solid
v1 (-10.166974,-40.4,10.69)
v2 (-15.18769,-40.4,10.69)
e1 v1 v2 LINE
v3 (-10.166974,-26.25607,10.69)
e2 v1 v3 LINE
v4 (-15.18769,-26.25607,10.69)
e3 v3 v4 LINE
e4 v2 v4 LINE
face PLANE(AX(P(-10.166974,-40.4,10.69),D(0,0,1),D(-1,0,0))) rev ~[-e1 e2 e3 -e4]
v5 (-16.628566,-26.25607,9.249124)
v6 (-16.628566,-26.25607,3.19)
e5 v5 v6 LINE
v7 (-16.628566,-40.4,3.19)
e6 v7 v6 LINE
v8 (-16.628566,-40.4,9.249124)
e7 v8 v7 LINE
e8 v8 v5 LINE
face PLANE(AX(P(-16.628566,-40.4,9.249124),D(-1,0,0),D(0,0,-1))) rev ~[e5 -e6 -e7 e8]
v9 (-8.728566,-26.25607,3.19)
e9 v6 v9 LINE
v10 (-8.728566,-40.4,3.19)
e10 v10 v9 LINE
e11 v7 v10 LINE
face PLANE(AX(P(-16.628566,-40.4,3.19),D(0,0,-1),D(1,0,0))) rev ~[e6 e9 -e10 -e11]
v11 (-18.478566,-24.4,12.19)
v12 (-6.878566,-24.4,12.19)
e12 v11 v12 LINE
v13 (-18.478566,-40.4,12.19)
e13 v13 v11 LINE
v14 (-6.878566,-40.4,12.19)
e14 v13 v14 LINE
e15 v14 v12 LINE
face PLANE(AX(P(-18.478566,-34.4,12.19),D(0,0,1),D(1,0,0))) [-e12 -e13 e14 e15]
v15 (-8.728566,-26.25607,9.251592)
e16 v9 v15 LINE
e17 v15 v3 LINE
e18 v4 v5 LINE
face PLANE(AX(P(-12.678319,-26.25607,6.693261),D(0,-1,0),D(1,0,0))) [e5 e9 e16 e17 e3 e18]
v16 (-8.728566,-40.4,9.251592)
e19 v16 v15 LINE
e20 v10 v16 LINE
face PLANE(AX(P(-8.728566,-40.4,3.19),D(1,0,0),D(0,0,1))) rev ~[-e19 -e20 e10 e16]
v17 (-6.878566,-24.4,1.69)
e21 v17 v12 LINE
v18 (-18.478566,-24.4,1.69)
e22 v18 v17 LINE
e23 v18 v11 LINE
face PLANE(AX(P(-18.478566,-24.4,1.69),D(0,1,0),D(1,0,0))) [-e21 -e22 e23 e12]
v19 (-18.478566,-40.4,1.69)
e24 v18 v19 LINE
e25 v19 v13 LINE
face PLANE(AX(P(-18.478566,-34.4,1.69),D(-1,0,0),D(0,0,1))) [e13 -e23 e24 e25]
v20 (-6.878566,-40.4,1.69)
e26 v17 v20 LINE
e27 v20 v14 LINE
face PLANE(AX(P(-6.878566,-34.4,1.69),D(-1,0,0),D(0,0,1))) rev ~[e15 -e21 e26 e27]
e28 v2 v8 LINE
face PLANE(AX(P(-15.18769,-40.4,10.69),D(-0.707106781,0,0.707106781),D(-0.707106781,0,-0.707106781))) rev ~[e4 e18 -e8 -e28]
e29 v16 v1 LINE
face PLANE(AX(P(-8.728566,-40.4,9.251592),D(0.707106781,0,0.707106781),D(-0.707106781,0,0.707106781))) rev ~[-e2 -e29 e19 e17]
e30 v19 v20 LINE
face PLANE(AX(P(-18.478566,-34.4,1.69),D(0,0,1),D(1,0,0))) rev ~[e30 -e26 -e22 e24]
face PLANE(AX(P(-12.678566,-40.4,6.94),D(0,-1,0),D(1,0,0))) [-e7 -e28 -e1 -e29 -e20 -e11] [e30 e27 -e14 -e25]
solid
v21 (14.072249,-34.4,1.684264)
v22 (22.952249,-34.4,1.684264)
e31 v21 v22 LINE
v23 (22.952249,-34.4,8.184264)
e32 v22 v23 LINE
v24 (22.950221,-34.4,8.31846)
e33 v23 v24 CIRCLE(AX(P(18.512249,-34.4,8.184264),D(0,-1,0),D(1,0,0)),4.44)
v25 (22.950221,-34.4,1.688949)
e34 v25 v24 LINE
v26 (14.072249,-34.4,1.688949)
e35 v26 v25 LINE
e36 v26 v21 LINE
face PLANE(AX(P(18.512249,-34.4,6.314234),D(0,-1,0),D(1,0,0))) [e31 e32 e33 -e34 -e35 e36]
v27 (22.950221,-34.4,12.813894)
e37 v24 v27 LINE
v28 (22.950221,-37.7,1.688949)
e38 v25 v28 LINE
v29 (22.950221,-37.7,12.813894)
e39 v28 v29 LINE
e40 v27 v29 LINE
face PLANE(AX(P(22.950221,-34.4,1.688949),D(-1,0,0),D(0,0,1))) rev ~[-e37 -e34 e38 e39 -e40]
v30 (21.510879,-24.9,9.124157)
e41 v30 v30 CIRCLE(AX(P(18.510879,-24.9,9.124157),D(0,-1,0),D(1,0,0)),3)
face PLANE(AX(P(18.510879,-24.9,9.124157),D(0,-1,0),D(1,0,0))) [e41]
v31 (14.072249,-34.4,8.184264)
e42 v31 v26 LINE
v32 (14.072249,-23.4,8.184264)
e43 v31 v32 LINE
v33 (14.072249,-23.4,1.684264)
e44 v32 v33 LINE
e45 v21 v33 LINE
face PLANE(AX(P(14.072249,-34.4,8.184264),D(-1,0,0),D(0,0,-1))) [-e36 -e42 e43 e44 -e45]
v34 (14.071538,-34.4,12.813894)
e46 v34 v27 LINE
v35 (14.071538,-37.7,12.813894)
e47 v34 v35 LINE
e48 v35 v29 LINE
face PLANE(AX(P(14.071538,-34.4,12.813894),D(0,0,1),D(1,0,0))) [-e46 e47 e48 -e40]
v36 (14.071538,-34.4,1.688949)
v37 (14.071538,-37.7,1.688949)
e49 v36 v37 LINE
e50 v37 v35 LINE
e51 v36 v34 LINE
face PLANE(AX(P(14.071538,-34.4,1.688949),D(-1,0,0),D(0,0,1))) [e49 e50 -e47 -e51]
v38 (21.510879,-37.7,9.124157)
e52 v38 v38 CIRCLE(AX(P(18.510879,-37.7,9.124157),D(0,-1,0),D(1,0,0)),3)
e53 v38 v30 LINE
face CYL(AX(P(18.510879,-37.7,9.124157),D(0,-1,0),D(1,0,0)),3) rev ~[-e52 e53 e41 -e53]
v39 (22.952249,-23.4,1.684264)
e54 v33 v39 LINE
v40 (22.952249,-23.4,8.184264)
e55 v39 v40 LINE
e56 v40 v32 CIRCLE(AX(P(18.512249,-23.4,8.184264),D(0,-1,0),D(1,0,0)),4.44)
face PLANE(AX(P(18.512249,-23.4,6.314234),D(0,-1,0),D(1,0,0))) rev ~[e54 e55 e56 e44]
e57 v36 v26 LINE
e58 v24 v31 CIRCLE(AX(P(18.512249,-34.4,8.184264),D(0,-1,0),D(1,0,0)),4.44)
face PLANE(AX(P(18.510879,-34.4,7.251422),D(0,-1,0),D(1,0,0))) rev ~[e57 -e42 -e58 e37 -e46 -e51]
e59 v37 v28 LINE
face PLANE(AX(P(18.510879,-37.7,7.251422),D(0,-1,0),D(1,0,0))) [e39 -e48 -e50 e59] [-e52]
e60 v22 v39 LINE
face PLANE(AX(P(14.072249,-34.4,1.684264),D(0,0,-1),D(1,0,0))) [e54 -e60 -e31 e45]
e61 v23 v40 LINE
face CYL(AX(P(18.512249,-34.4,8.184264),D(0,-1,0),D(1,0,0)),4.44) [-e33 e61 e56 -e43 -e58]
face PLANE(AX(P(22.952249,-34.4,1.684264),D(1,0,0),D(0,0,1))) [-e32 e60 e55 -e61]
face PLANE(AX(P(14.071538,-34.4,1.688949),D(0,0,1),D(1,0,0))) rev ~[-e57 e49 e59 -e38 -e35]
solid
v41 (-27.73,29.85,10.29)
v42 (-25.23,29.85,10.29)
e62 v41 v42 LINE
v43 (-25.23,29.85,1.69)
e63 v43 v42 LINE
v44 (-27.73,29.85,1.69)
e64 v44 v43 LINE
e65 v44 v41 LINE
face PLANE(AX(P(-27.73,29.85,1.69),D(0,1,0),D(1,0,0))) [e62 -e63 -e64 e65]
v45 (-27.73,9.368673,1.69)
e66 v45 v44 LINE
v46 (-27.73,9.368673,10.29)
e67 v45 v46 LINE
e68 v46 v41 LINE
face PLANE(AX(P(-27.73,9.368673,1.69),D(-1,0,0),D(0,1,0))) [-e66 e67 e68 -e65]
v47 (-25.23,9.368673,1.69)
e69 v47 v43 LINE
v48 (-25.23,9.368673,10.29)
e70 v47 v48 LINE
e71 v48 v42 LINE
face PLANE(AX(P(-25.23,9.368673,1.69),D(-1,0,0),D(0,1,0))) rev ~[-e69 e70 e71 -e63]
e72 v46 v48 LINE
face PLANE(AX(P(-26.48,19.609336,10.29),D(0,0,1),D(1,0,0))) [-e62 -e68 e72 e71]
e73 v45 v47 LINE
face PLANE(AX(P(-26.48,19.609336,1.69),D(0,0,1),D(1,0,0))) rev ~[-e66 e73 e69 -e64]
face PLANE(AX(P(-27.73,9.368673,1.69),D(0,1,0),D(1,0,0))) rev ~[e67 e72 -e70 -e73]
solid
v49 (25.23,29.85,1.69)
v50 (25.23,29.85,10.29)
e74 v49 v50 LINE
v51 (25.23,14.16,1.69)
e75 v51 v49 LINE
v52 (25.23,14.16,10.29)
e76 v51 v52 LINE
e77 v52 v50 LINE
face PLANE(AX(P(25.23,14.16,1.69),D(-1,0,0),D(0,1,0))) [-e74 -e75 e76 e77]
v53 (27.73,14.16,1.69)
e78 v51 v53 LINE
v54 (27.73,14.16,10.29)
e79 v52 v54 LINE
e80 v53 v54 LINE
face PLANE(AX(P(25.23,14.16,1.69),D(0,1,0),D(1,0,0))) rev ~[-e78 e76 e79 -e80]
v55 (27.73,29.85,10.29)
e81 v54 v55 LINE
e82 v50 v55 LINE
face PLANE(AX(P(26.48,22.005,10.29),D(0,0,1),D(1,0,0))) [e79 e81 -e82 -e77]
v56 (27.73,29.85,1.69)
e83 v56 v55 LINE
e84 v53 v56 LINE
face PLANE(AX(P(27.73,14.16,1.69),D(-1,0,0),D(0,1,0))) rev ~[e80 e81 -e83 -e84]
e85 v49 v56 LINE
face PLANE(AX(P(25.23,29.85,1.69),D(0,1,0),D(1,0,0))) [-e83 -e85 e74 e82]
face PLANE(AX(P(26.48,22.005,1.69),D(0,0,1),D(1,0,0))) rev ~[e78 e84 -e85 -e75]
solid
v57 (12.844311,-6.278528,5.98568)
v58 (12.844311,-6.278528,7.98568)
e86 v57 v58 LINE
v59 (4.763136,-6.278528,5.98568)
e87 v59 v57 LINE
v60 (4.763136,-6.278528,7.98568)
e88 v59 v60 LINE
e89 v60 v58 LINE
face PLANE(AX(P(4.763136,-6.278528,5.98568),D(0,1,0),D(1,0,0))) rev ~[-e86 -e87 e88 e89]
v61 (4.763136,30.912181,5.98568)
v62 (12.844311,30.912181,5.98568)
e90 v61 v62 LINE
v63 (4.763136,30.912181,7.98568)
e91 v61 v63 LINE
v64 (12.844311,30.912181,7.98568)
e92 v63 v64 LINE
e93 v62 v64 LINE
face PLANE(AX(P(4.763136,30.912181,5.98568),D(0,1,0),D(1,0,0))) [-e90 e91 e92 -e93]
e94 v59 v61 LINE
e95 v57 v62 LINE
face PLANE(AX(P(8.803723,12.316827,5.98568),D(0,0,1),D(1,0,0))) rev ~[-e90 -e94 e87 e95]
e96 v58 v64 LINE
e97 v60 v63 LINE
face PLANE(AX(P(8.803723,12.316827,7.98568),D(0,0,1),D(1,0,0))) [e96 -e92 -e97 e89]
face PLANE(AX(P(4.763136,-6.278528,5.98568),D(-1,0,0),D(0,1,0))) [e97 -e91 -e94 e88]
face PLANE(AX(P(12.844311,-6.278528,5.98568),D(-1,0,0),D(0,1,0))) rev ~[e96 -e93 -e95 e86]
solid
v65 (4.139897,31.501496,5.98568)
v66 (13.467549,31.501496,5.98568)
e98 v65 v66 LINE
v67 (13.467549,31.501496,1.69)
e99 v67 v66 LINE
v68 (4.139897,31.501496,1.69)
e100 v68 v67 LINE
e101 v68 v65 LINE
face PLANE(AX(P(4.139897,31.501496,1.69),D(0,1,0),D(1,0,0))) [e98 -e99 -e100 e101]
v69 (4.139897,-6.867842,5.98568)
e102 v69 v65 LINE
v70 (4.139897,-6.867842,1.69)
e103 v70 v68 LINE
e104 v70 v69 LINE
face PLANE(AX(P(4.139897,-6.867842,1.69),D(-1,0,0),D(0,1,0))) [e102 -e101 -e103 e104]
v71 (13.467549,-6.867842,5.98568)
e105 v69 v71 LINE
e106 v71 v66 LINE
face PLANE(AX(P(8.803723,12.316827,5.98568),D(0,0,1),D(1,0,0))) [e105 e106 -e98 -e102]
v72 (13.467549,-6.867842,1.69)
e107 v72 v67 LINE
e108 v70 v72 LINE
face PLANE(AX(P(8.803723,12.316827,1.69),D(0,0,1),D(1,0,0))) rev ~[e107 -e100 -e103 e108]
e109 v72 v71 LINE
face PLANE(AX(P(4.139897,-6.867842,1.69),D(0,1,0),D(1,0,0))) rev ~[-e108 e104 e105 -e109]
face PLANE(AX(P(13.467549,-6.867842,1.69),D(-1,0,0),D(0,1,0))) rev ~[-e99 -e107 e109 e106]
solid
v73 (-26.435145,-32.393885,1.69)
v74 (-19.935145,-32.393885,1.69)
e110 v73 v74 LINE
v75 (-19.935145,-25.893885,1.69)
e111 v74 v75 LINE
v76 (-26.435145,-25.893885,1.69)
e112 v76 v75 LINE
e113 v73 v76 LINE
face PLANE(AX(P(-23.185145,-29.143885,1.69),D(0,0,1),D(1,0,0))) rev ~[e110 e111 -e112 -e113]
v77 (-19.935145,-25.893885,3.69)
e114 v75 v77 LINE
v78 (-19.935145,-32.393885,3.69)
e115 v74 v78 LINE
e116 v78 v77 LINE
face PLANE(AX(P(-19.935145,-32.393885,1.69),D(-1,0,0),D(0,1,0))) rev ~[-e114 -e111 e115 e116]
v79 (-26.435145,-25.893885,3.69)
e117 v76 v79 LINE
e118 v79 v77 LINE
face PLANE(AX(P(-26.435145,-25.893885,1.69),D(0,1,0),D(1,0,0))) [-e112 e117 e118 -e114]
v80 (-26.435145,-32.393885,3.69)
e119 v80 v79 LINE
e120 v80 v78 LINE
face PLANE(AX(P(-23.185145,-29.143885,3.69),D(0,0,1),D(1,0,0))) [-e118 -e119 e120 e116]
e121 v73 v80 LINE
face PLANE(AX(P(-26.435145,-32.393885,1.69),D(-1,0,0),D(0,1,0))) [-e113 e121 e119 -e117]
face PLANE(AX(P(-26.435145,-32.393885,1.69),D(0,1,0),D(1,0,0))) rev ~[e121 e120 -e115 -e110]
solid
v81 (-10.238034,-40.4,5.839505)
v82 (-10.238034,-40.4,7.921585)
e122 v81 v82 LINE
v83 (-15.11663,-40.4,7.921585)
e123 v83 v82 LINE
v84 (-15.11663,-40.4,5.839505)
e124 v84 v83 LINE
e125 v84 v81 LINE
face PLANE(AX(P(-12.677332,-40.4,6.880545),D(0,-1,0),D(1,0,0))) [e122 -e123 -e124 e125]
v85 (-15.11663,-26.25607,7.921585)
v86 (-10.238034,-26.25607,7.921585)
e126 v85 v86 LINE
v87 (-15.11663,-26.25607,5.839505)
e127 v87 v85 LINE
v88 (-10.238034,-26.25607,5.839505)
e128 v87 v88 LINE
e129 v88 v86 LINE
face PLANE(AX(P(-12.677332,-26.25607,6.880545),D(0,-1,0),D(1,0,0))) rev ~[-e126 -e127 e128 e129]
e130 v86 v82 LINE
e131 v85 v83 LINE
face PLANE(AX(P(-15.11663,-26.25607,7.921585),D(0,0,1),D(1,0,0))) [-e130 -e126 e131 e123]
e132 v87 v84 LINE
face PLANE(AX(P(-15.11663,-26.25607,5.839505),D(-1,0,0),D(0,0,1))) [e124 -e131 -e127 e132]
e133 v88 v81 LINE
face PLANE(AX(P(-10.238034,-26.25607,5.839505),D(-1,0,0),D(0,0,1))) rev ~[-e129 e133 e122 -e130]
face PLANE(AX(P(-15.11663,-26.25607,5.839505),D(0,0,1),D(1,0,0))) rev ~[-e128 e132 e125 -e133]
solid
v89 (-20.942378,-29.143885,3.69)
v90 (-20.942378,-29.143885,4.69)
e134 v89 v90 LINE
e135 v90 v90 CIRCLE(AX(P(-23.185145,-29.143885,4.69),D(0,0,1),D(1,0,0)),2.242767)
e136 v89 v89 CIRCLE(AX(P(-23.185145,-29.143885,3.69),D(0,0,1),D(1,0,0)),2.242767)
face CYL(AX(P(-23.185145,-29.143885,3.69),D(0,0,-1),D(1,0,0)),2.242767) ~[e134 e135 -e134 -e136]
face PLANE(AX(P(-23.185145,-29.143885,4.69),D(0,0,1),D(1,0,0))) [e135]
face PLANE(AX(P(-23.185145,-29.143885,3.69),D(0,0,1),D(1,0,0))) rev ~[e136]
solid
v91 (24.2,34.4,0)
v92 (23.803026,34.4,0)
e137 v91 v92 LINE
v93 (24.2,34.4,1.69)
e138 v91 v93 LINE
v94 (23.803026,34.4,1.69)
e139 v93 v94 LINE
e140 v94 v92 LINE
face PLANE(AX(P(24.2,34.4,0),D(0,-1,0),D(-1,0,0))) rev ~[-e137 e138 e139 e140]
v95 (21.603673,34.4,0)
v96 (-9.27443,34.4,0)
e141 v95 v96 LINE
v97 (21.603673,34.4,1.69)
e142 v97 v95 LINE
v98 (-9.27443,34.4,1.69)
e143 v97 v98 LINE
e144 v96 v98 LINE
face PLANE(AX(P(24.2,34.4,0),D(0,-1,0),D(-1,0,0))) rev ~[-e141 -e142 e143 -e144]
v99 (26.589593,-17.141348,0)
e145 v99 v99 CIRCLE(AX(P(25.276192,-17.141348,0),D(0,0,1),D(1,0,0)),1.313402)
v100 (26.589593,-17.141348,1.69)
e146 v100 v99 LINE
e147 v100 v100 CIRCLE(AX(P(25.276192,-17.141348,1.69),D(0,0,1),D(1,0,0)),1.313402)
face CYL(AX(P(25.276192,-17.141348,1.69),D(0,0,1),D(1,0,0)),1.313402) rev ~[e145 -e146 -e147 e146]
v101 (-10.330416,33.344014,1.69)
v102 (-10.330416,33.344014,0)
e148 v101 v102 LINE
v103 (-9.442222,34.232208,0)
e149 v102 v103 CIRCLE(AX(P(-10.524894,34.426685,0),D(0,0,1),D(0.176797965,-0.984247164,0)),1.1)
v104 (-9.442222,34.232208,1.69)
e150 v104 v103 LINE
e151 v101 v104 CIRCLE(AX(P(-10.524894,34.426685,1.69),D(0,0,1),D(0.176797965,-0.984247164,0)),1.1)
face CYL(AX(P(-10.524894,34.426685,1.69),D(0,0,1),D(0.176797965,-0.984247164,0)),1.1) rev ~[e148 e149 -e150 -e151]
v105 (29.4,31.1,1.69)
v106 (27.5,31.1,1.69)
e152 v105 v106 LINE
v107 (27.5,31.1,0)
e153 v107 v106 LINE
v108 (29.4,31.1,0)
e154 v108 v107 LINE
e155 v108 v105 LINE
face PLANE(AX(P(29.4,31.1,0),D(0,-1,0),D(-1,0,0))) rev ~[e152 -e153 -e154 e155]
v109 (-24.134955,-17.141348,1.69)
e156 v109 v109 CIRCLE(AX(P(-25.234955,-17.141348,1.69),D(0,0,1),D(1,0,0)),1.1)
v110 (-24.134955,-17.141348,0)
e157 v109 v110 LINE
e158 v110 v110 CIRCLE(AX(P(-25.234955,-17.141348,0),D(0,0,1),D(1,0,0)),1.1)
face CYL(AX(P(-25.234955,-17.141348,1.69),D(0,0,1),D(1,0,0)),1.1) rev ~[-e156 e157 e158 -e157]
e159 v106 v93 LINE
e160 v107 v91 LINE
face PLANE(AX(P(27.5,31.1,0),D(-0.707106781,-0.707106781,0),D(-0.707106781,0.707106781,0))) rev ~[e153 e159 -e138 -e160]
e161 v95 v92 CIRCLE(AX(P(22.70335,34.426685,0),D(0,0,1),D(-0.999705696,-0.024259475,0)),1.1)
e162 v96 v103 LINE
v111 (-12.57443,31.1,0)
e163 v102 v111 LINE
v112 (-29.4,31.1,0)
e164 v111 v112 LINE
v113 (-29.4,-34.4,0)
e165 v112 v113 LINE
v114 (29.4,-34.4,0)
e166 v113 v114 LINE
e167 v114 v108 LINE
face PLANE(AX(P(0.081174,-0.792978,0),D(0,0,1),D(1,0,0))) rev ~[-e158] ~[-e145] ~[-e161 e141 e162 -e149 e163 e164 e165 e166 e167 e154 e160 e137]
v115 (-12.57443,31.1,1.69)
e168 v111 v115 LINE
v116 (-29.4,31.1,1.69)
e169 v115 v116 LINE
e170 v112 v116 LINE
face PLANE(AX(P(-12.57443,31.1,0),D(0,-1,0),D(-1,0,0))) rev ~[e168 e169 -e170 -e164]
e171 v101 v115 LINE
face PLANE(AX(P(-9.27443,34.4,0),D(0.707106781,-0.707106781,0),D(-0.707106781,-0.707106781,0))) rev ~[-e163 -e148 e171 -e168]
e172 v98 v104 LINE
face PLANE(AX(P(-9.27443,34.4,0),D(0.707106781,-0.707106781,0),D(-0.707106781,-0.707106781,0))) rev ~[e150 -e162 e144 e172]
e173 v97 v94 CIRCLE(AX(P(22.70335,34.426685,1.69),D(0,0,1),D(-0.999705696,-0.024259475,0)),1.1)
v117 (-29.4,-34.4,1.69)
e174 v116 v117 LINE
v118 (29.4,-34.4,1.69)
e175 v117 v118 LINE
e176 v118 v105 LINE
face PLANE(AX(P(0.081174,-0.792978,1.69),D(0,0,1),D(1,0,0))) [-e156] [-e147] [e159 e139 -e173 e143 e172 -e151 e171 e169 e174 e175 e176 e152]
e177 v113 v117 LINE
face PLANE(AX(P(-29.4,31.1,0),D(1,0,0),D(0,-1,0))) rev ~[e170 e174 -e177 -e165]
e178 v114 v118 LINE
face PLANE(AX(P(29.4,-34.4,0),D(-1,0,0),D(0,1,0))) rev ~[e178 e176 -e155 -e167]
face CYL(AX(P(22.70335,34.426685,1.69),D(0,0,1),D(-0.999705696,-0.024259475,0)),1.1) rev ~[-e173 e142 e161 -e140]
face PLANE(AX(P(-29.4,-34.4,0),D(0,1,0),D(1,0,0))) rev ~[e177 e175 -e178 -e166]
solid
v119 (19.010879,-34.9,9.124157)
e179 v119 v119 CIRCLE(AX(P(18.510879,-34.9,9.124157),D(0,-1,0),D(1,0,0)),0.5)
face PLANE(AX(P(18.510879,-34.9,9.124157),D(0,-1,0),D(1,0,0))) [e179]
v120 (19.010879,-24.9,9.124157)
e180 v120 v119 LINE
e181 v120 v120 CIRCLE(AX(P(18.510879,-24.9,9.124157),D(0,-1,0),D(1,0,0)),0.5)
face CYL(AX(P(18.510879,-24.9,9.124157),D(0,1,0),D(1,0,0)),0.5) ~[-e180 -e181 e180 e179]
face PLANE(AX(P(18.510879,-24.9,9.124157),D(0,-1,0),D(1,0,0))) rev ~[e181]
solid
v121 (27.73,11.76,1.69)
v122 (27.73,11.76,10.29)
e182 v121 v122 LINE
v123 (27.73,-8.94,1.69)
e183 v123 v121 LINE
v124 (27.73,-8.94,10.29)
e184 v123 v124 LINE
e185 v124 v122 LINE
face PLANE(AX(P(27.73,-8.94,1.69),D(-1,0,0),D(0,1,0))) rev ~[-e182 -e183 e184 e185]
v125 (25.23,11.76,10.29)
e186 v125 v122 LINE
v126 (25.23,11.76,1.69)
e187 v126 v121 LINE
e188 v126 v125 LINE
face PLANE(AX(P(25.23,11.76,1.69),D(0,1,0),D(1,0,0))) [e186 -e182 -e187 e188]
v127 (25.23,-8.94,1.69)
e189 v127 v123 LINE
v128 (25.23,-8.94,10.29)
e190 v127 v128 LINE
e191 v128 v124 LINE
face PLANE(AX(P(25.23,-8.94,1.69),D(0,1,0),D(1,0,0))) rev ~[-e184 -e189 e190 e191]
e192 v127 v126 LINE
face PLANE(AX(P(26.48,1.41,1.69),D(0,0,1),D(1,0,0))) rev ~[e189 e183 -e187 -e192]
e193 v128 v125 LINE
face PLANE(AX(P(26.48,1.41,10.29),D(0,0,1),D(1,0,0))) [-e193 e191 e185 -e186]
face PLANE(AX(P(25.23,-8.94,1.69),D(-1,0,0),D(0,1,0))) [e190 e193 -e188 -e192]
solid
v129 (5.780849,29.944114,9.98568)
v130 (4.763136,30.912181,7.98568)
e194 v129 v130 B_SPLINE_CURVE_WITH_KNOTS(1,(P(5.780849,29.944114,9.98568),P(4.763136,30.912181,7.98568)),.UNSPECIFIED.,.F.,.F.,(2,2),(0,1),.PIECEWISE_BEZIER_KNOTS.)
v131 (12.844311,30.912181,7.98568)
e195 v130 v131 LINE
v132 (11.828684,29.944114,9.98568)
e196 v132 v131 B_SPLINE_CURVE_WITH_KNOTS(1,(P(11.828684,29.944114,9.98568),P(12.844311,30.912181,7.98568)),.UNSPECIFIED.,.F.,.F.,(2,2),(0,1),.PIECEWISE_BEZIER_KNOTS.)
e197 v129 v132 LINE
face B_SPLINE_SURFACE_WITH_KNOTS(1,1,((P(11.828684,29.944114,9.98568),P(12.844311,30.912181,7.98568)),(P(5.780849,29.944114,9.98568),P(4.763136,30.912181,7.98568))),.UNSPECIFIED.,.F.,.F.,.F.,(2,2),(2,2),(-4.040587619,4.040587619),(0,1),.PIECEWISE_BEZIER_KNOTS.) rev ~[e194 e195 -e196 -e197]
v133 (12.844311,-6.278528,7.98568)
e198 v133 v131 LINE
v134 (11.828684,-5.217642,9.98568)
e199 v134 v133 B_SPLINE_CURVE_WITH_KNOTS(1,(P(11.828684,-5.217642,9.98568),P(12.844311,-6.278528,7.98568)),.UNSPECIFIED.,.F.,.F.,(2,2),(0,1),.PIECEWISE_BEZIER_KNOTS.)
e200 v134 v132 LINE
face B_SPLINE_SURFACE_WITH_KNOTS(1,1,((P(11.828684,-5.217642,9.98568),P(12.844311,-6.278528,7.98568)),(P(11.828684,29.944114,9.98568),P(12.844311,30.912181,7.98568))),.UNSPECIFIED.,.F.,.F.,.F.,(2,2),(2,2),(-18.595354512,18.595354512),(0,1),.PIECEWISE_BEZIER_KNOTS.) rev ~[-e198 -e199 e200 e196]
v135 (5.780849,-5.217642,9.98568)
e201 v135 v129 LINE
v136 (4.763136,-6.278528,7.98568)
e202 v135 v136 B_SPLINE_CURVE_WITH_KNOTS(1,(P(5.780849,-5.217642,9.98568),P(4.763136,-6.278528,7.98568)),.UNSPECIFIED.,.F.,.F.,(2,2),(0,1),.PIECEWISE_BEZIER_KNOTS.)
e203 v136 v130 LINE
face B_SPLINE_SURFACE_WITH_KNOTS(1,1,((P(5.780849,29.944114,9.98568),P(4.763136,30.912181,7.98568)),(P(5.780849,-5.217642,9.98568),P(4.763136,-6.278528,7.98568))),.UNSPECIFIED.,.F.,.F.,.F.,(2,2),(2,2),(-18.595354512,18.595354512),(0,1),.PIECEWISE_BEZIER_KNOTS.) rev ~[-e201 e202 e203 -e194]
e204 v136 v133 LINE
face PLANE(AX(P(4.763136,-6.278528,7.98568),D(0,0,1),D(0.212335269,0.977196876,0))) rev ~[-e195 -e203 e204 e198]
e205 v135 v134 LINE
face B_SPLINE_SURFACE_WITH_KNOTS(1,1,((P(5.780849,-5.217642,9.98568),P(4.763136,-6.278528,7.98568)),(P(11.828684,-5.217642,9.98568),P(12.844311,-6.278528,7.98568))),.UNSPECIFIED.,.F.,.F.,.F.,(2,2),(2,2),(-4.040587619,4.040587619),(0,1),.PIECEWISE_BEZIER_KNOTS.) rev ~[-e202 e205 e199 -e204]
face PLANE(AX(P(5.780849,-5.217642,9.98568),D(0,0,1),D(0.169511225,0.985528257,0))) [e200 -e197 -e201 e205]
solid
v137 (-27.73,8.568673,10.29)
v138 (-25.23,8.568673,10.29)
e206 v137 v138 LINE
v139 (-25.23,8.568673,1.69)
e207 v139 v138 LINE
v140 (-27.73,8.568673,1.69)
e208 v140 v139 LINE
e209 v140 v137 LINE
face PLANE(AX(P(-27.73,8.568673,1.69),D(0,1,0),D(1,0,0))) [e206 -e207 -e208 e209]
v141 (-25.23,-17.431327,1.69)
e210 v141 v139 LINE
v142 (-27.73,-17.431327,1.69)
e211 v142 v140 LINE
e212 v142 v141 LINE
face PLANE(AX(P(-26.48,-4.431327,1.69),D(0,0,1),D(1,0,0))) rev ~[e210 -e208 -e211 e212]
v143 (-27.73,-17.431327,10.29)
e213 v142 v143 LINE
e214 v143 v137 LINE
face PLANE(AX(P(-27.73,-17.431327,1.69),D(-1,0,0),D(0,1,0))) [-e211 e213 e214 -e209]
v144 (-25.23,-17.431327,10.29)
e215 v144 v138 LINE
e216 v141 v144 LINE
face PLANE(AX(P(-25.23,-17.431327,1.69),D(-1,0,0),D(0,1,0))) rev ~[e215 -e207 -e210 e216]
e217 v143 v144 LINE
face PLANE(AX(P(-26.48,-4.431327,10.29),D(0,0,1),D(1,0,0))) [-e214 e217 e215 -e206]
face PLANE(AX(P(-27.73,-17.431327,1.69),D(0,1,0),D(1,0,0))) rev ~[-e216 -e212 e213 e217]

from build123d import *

# Parameters (mm, degrees)
F1_DEPTH   = 1.69
F2_W       = 2.5
F2_H       = 20.7
F3_DEPTH   = 8.6
F2_H_2     = 15.69
F2_H_3     = 20.481327492
F2_H_4     = 26
F6_DEPTH   = 11
F7_W       = 8.87868274
F7_H       = 11.1249446636
F8_DEPTH   = 3.3
F9_R       = 3
F10_DEPTH  = 12.8
F11_R      = 0.5
F12_DEPTH  = 10
F13_W      = 11.6
F13_H      = 10
F14_DEPTH  = 10.5
F15_W      = 11.6
F15_H      = 10.5
F16_DEPTH  = 6
F18_DEPTH  = 14.14393
F19_W      = 4.8785965383
F19_H      = 2.0820805803
F20_DEPTH  = 14.14393
F21_W      = 6.5
F21_H      = 6.5
F22_DEPTH  = 2
F23_R      = 2.2427667378
F24_DEPTH  = 1
F25_W      = 9.3276520822
F25_H      = 38.3693373368
F26_DEPTH  = 4.29568
F27_W      = 8.0811752376
F27_H      = 37.1907090231
F28_DEPTH  = 2
F30_W      = 6.0478351079
F30_H      = 35.1617564447
F28_FACE_W = 8.0811752376
F28_FACE_H = 37.1907090231
F33_DEPTH  = 1.691
F34_R      = 1.1
F34_R_2    = 1.3134018391
F35_DEPTH  = 1.691


# Not quite as in the source:
# - a feature of the source that left no trace in its solid (it failed there, or was rolled back) is left out


with BuildPart() as f1:
    # F0 (on Top) → F1 (new body)
    with BuildSketch(Plane.XY):
        Polygon((24.2, 34.4), (-9.2744298918, 34.4), (-12.5744298918, 31.1), (-29.4, 31.1), (-29.4, -34.4), (29.4, -34.4), (29.4, 31.1), (27.5, 31.1), align=None)
    extrude(amount=F1_DEPTH)

    # F32 (on face) → F33 (cut, through all)
    with BuildSketch(Plane.XY.offset(1.69)):
        with BuildLine():
            Line((-9.4422222306, 34.2322076612), (-10.3304163494, 33.3440135424))
            ThreePointArc((-10.3304163494, 33.3440135424), (-9.7470766516, 33.6488679634), (-9.4422222306, 34.2322076612))
        make_face()
        with BuildLine():
            ThreePointArc((-9.4422222306, 34.2322076612), (-9.4292347048, 34.3290613178), (-9.4248941109, 34.4266854227))
            ThreePointArc((-9.4248941109, 34.4266854227), (-11.3686729734, 35.132402952), (-10.3304163494, 33.3440135424))
            Line((-10.3304163494, 33.3440135424), (-9.4422222306, 34.2322076612))
        make_face()
        with BuildLine():
            Line((23.8030258555, 34.4), (21.6036733251, 34.4))
            ThreePointArc((21.6036733251, 34.4), (22.7033495903, 33.3266854227), (23.8030258555, 34.4))
        make_face()
        with BuildLine():
            ThreePointArc((23.8033495903, 34.4266854227), (22.6900058972, 35.526604486), (21.6036733251, 34.4))
            Line((21.6036733251, 34.4), (23.8030258555, 34.4))
            ThreePointArc((23.8030258555, 34.4), (23.8032686536, 34.4133417295), (23.8033495903, 34.4266854227))
        make_face()
    extrude(amount=-F33_DEPTH, mode=Mode.SUBTRACT)

    # F34 (on face) → F35 (cut, through all)
    with BuildSketch(Plane.XY.offset(1.69)):
        with Locations((-25.2349545183, -17.141347751)):
            Circle(F34_R)
        with Locations((25.2761915326, -17.141347751)):
            Circle(F34_R_2)
    extrude(amount=-F35_DEPTH, mode=Mode.SUBTRACT)


with BuildPart() as f3:
    # F2 (on face) → F3 (new body)
    with BuildSketch(Plane.XY.offset(1.69)):
        with Locations((26.48, 1.41)):
            Rectangle(F2_W, F2_H)
    extrude(amount=F3_DEPTH)


with BuildPart() as f3b:
    # F2 (on face) → F3, piece 2 (new body)
    with BuildSketch(Plane.XY.offset(1.69)):
        with Locations((26.48, 22.005)):
            Rectangle(F2_W, F2_H_2)
    extrude(amount=F3_DEPTH)


with BuildPart() as f3c:
    # F2 (on face) → F3, piece 3 (new body)
    with BuildSketch(Plane.XY.offset(1.69)):
        with Locations((-26.48, 19.609336254)):
            Rectangle(F2_W, F2_H_3)
    extrude(amount=F3_DEPTH)


with BuildPart() as f3d:
    # F2 (on face) → F3, piece 4 (new body)
    with BuildSketch(Plane.XY.offset(1.69)):
        with Locations((-26.48, -4.431327492)):
            Rectangle(F2_W, F2_H_4)
    extrude(amount=F3_DEPTH)


with BuildPart() as f6:
    # F5 (on offset) → F6 (new body)
    with BuildSketch(Plane.XZ.offset(34.4)):
        with BuildLine():
            Line((14.0722493033, 1.6842637178), (22.9522493033, 1.6842637178))
            Line((22.9522493033, 1.6842637178), (22.9522493033, 8.1842637178))
            ThreePointArc((22.9522493033, 8.1842637178), (18.5122493033, 12.6242637178), (14.0722493033, 8.1842637178))
            Line((14.0722493033, 8.1842637178), (14.0722493033, 1.6842637178))
        make_face()
    extrude(amount=-F6_DEPTH)

    # F7 (on offset) → F8 (join)
    with BuildSketch(Plane.XZ.offset(34.4)):
        with Locations((18.5108794831, 7.2514217463)):
            Rectangle(F7_W, F7_H)
    extrude(amount=F8_DEPTH)

    # F9 (on face) → F10 (cut)
    with BuildSketch(Plane.XZ.offset(37.7)):
        with Locations((18.5108794831, 9.124157019)):
            Circle(F9_R)
    extrude(amount=-F10_DEPTH, mode=Mode.SUBTRACT)


with BuildPart() as f12:
    # F11 (on face) → F12 (new body)
    with BuildSketch(Plane.XZ.offset(24.9)):
        with Locations((18.5108794831, 9.124157019)):
            Circle(F11_R)
    extrude(amount=F12_DEPTH)


with BuildPart() as f14:
    # F13 (on face) → F14 (new body)
    with BuildSketch(Plane.XY.offset(1.69)):
        with Locations((-12.6785661542, -29.4)):
            Rectangle(F13_W, F13_H)
    extrude(amount=F14_DEPTH)

    # F15 (on face) → F16 (join)
    with BuildSketch(Plane.XZ.offset(34.4)):
        with Locations((-12.6785661542, 6.94)):
            Rectangle(F15_W, F15_H)
    extrude(amount=F16_DEPTH)

    # F17 (on face) → F18 (cut)
    with BuildSketch(Plane.XZ.offset(40.4)):
        Polygon((-16.6285661542, 9.2491237447), (-16.6285661542, 3.19), (-8.7285661542, 3.19), (-8.7285661542, 9.2515923473), (-10.1669738069, 10.69), (-15.1876898989, 10.69), align=None)
    extrude(amount=-F18_DEPTH, mode=Mode.SUBTRACT)


with BuildPart() as f20:
    # F19 (on face) → F20 (new body, through all)
    with BuildSketch(Plane.XZ.offset(26.25607)):
        with Locations((-12.6773318529, 6.8805450574)):
            Rectangle(F19_W, F19_H)
    extrude(amount=F20_DEPTH)


with BuildPart() as f22:
    # F21 (on face) → F22 (new body)
    with BuildSketch(Plane.XY.offset(1.69)):
        with Locations((-23.1851451099, -29.143884778)):
            Rectangle(F21_W, F21_H)
    extrude(amount=F22_DEPTH)


with BuildPart() as f24:
    # F23 (on face) → F24 (new body)
    with BuildSketch(Plane.XY.offset(3.69)):
        with Locations((-23.1851451099, -29.143884778)):
            Circle(F23_R)
    extrude(amount=F24_DEPTH)


with BuildPart() as f26:
    # F25 (on face) → F26 (new body)
    with BuildSketch(Plane.XY.offset(1.69)):
        with Locations((8.8037233053, 12.316826851)):
            Rectangle(F25_W, F25_H)
    extrude(amount=F26_DEPTH)


with BuildPart() as f28:
    # F27 (on face) → F28 (new body)
    with BuildSketch(Plane.XY.offset(5.98568)):
        with Locations((8.8037233053, 12.316826851)):
            Rectangle(F27_W, F27_H)
    extrude(amount=F28_DEPTH)


with BuildPart() as f31:
    # F30 (on offset) → F31 section 0
    with BuildSketch(Plane.XY.offset(9.98568)):
        with Locations((8.8047666941, 12.3632361647)):
            Rectangle(F30_W, F30_H)
    # F28_face (on face) → F31 section 1
    with BuildSketch(Plane(origin=(8.8037233053, 12.316826851, 7.98568), x_dir=(1, 0, 0), z_dir=(0, 0, 1))):
        Rectangle(F28_FACE_W, F28_FACE_H)
    loft()


solid = Compound([f1.part, f3.part, f3b.part, f3c.part, f3d.part, f6.part, f12.part, f14.part, f20.part, f22.part, f24.part, f26.part, f28.part, f31.part])
